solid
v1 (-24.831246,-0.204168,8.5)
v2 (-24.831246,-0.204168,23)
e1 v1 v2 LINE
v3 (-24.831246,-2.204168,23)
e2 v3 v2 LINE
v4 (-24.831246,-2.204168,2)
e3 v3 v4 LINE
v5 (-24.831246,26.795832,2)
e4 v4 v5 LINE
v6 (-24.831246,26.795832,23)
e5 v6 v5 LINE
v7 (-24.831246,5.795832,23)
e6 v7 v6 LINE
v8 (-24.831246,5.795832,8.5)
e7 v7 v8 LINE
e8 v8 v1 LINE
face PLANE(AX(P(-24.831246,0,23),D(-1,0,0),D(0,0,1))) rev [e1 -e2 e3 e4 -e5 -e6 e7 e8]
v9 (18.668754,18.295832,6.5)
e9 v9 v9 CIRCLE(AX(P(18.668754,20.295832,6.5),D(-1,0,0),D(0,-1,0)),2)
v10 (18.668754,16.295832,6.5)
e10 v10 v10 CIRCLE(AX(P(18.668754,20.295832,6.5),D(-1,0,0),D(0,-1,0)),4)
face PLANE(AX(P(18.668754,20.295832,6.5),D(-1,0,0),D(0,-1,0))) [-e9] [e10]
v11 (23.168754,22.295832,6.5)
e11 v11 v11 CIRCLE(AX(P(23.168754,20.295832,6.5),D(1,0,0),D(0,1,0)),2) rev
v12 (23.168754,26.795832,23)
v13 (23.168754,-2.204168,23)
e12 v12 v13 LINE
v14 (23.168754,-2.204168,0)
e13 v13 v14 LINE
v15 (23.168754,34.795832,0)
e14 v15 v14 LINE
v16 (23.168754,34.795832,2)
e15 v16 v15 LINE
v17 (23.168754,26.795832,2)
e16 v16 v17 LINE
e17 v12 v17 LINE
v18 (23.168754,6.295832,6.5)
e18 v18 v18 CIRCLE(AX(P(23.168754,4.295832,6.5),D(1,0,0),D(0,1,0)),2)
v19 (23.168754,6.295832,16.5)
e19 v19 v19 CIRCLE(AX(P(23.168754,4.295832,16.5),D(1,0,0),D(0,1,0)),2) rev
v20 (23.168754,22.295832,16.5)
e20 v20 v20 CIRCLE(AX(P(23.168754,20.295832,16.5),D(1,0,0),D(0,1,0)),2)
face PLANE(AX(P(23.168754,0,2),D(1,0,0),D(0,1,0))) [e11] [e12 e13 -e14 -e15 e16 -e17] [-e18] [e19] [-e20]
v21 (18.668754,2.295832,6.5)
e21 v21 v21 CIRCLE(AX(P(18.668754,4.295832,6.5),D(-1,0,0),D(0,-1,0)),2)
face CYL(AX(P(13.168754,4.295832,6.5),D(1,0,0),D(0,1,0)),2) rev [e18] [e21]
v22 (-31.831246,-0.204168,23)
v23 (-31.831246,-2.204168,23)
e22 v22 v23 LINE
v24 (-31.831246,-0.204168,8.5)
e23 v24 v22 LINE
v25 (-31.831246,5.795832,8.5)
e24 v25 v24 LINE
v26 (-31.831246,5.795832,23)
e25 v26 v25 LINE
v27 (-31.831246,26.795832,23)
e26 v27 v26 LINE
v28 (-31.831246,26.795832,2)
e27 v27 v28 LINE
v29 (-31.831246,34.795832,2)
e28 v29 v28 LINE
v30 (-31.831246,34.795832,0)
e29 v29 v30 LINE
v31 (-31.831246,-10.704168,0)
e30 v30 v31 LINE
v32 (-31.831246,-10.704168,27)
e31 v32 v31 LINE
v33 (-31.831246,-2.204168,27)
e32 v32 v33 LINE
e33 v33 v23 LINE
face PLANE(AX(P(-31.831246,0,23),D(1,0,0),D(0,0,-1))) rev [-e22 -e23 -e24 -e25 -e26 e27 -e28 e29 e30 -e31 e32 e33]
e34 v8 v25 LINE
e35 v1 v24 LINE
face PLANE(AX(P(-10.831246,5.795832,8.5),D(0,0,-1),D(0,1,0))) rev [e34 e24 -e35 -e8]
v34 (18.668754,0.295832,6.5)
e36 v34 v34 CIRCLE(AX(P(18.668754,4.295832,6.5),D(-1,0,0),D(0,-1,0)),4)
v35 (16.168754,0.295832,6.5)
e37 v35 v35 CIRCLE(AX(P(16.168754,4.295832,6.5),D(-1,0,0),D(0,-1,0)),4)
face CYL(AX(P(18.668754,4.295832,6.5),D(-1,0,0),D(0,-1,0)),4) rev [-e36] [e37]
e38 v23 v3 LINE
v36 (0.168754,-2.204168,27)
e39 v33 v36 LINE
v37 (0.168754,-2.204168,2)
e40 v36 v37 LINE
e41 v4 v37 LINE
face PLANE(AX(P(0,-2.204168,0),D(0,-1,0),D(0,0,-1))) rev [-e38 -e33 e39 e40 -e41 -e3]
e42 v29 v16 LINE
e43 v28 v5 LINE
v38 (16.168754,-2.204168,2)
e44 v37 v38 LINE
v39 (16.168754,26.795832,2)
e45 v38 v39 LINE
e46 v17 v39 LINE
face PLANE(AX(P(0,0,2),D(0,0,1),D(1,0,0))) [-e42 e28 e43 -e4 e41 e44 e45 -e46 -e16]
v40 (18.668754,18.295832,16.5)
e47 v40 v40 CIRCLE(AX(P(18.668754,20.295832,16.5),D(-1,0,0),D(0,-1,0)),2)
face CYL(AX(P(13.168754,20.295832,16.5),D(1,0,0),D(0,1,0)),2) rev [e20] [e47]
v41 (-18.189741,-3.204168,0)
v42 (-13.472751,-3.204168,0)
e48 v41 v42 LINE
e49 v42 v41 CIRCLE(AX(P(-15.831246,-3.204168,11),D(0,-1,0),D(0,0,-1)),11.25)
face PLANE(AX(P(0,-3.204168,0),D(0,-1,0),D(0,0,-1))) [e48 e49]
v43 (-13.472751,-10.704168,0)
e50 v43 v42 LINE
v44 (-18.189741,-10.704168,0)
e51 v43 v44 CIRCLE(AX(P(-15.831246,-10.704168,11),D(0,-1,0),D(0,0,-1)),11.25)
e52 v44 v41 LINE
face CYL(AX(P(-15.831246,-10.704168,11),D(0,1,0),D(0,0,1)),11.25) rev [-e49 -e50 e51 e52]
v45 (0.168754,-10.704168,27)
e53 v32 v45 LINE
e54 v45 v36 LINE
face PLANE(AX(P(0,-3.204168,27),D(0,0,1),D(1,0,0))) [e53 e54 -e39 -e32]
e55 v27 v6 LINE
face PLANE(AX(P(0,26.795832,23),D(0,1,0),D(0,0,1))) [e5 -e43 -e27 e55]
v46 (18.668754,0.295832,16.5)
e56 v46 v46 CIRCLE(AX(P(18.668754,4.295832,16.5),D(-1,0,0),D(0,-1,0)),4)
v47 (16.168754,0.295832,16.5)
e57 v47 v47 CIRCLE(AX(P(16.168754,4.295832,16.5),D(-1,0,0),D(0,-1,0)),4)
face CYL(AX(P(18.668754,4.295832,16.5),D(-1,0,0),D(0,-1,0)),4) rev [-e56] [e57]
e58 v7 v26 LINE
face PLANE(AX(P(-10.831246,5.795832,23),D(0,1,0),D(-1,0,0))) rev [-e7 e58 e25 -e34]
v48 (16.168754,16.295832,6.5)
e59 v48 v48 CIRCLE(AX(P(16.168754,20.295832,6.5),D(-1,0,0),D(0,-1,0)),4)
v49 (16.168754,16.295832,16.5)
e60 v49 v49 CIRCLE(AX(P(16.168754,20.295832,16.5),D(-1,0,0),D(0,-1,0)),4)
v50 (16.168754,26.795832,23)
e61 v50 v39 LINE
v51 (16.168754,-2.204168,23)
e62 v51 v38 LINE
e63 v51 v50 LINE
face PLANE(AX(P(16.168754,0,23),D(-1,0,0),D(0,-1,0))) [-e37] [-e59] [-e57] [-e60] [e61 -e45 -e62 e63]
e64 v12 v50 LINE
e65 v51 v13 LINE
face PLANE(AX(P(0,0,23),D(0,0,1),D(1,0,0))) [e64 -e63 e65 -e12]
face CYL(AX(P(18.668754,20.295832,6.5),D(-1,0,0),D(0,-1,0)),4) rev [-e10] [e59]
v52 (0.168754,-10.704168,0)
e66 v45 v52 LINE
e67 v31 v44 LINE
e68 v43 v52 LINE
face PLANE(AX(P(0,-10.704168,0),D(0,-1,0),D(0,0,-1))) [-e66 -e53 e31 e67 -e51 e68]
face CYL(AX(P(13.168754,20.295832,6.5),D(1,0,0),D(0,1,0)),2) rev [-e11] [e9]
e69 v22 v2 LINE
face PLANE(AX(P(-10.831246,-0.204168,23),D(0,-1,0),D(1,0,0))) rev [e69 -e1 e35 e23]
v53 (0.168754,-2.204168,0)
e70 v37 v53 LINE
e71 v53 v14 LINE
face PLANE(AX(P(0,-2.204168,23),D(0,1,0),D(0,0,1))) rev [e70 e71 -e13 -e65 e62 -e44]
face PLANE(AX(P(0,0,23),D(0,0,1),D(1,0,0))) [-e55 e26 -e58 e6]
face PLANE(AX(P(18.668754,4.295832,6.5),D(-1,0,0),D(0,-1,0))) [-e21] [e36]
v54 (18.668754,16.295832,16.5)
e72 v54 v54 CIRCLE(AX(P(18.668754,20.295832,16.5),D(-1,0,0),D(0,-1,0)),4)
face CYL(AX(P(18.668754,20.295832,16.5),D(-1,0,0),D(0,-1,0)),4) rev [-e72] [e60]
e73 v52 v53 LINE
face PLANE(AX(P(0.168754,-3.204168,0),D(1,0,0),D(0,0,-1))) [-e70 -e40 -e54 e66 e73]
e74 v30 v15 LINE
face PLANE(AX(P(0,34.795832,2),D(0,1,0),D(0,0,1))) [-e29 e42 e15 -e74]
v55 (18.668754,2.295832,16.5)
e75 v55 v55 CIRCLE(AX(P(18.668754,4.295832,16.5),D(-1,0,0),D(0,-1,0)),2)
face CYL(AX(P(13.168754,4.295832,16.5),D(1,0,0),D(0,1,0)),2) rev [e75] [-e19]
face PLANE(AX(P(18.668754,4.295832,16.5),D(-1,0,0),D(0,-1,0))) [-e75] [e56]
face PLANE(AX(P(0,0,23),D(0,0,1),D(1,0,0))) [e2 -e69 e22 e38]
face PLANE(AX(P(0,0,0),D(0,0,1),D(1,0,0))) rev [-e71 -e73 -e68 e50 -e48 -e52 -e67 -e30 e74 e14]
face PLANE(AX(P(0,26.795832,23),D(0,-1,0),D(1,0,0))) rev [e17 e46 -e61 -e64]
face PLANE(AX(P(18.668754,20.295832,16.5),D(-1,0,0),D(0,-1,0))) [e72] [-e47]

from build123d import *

# Parameters (mm, degrees)
SKETCH1_W            = 7
SKETCH1_H            = 29
SIDES_DEPTH          = 23
SIDES_2_DEPTH        = 23
BACK_PLATE_DEPTH     = 2
SKETCH2_W            = 32
SKETCH2_H            = 27
BEARING_BASE_DEPTH   = 1
SKETCH3_W            = 14.5
SKETCH3_H            = 6
WIRE_2_DEPTH         = 21
BEARING_START        = 1
BEARING_DEPTH        = 7.5
MOUTNING_HOLES_R     = 2
SCREW_HOLES_DEPTH    = 10
SCREW_START          = -4.5
MOUTNING_HOLES_3_R   = 4
MOUTNING_HOLES_3_R_2 = 2
SCREW_HEADS_DEPTH    = 2.5


# Read off the part's stored shape, not the designer's step: Bearing
with BuildPart() as part:
    # Sketch1 → Sides (new body)
    with BuildSketch(Plane.XY):
        with Locations((-28.331246011, 12.295832375)):
            Rectangle(SKETCH1_W, SKETCH1_H)
    extrude(amount=SIDES_DEPTH)



with BuildPart() as body_2:
    # Sketch1 → Sides 2 (new body)
    with BuildSketch(Plane.XY):
        with Locations((19.668753989, 12.295832375)):
            Rectangle(SKETCH1_W, SKETCH1_H)
    extrude(amount=SIDES_2_DEPTH)


with BuildPart() as part_1:
    add(part.part)

    add(body_2.part)  # Back Plate merges body 2
    # Sketch1<3> → Back Plate (add)
    with BuildSketch(Plane.XY):
        Polygon((-4.331246011, -2.204167625), (-4.331246011, 34.795832375), (-31.831246011, 34.795832375), (-31.831246011, 26.795832375), (-24.831246011, 26.795832375), (-24.831246011, -2.204167625), align=None)
        Polygon((23.168753989, 34.795832375), (-4.331246011, 34.795832375), (-4.331246011, -2.204167625), (16.168753989, -2.204167625), (16.168753989, 26.795832375), (23.168753989, 26.795832375), align=None)
    extrude(amount=BACK_PLATE_DEPTH)

    # Sketch2 → Bearing Base (add)
    with BuildSketch(Plane.XZ.offset(2.204167625)):
        with Locations((-15.831246011, 13.5)):
            Rectangle(SKETCH2_W, SKETCH2_H)
    extrude(amount=BEARING_BASE_DEPTH)

    # Sketch3 → Wire 2 (cut)
    with BuildSketch(Plane.ZY.offset(31.831246011)):
        with Locations((15.75, 2.795832375)):
            Rectangle(SKETCH3_W, SKETCH3_H)
    extrude(amount=-WIRE_2_DEPTH, mode=Mode.SUBTRACT)

    # Bearing outline → Bearing (add)
    with BuildSketch(Plane.XZ.offset(2.204167625).offset(BEARING_START)):
        with BuildLine():
            Line((-31.831246011, 27), (-31.831246011, 0))
            Line((-31.831246011, 0), (-18.189741294, 0))
            ThreePointArc((-18.189741294, 0), (-15.831246011, 22.25), (-13.472750728, 0))
            Line((-13.472750728, 0), (0.168753989, 0))
            Line((0.168753989, 0), (0.168753989, 27))
            Line((0.168753989, 27), (-31.831246011, 27))
        make_face()
    extrude(amount=BEARING_DEPTH)

    # Moutning Holes → Screw Holes (cut)
    with BuildSketch(Plane(origin=(23.168753989, 0, 0), x_dir=(0, 0, -1), z_dir=(1, 0, 0))):
        with Locations(Location((-6.5, 4.295832375, 0), (0, 0, 90))):
            Circle(MOUTNING_HOLES_R)
        with Locations(Location((-16.5, 4.295832375, 0), (0, 0, 90))):
            Circle(MOUTNING_HOLES_R)
        with Locations(Location((-16.5, 20.295832375, 0), (0, 0, 90))):
            Circle(MOUTNING_HOLES_R)
        with Locations(Location((-6.5, 20.295832375, 0), (0, 0, 90))):
            Circle(MOUTNING_HOLES_R)
    extrude(amount=-SCREW_HOLES_DEPTH, mode=Mode.SUBTRACT)

    # Moutning Holes<3> → Screw Heads (cut)
    # profile 1 of 4: a face of its own
    with BuildSketch(Plane(origin=(23.168753989, 0, 0), x_dir=(0, 0, -1), z_dir=(1, 0, 0)).offset(SCREW_START)):
        with Locations(Location((-6.5, 4.295832375, 0), (0, 0, 270))):
            Circle(MOUTNING_HOLES_3_R)
        with Locations(Location((-6.5, 4.295832375, 0), (0, 0, 90))):
            Circle(MOUTNING_HOLES_3_R_2, mode=Mode.SUBTRACT)
    # profile 2 of 4: a face of its own
    with BuildSketch(Plane(origin=(23.168753989, 0, 0), x_dir=(0, 0, -1), z_dir=(1, 0, 0)).offset(SCREW_START)):
        with Locations(Location((-16.5, 4.295832375, 0), (0, 0, 270))):
            Circle(MOUTNING_HOLES_3_R)
        with Locations(Location((-16.5, 4.295832375, 0), (0, 0, 90))):
            Circle(MOUTNING_HOLES_3_R_2, mode=Mode.SUBTRACT)
    # profile 3 of 4: a face of its own
    with BuildSketch(Plane(origin=(23.168753989, 0, 0), x_dir=(0, 0, -1), z_dir=(1, 0, 0)).offset(SCREW_START)):
        with Locations(Location((-16.5, 20.295832375, 0), (0, 0, 270))):
            Circle(MOUTNING_HOLES_3_R)
        with Locations(Location((-16.5, 20.295832375, 0), (0, 0, 90))):
            Circle(MOUTNING_HOLES_3_R_2, mode=Mode.SUBTRACT)
    # profile 4 of 4: a face of its own
    with BuildSketch(Plane(origin=(23.168753989, 0, 0), x_dir=(0, 0, -1), z_dir=(1, 0, 0)).offset(SCREW_START)):
        with Locations(Location((-6.5, 20.295832375, 0), (0, 0, 270))):
            Circle(MOUTNING_HOLES_3_R)
        with Locations(Location((-6.5, 20.295832375, 0), (0, 0, 90))):
            Circle(MOUTNING_HOLES_3_R_2, mode=Mode.SUBTRACT)
    extrude(amount=-SCREW_HEADS_DEPTH, mode=Mode.SUBTRACT)


solid = part_1.part
